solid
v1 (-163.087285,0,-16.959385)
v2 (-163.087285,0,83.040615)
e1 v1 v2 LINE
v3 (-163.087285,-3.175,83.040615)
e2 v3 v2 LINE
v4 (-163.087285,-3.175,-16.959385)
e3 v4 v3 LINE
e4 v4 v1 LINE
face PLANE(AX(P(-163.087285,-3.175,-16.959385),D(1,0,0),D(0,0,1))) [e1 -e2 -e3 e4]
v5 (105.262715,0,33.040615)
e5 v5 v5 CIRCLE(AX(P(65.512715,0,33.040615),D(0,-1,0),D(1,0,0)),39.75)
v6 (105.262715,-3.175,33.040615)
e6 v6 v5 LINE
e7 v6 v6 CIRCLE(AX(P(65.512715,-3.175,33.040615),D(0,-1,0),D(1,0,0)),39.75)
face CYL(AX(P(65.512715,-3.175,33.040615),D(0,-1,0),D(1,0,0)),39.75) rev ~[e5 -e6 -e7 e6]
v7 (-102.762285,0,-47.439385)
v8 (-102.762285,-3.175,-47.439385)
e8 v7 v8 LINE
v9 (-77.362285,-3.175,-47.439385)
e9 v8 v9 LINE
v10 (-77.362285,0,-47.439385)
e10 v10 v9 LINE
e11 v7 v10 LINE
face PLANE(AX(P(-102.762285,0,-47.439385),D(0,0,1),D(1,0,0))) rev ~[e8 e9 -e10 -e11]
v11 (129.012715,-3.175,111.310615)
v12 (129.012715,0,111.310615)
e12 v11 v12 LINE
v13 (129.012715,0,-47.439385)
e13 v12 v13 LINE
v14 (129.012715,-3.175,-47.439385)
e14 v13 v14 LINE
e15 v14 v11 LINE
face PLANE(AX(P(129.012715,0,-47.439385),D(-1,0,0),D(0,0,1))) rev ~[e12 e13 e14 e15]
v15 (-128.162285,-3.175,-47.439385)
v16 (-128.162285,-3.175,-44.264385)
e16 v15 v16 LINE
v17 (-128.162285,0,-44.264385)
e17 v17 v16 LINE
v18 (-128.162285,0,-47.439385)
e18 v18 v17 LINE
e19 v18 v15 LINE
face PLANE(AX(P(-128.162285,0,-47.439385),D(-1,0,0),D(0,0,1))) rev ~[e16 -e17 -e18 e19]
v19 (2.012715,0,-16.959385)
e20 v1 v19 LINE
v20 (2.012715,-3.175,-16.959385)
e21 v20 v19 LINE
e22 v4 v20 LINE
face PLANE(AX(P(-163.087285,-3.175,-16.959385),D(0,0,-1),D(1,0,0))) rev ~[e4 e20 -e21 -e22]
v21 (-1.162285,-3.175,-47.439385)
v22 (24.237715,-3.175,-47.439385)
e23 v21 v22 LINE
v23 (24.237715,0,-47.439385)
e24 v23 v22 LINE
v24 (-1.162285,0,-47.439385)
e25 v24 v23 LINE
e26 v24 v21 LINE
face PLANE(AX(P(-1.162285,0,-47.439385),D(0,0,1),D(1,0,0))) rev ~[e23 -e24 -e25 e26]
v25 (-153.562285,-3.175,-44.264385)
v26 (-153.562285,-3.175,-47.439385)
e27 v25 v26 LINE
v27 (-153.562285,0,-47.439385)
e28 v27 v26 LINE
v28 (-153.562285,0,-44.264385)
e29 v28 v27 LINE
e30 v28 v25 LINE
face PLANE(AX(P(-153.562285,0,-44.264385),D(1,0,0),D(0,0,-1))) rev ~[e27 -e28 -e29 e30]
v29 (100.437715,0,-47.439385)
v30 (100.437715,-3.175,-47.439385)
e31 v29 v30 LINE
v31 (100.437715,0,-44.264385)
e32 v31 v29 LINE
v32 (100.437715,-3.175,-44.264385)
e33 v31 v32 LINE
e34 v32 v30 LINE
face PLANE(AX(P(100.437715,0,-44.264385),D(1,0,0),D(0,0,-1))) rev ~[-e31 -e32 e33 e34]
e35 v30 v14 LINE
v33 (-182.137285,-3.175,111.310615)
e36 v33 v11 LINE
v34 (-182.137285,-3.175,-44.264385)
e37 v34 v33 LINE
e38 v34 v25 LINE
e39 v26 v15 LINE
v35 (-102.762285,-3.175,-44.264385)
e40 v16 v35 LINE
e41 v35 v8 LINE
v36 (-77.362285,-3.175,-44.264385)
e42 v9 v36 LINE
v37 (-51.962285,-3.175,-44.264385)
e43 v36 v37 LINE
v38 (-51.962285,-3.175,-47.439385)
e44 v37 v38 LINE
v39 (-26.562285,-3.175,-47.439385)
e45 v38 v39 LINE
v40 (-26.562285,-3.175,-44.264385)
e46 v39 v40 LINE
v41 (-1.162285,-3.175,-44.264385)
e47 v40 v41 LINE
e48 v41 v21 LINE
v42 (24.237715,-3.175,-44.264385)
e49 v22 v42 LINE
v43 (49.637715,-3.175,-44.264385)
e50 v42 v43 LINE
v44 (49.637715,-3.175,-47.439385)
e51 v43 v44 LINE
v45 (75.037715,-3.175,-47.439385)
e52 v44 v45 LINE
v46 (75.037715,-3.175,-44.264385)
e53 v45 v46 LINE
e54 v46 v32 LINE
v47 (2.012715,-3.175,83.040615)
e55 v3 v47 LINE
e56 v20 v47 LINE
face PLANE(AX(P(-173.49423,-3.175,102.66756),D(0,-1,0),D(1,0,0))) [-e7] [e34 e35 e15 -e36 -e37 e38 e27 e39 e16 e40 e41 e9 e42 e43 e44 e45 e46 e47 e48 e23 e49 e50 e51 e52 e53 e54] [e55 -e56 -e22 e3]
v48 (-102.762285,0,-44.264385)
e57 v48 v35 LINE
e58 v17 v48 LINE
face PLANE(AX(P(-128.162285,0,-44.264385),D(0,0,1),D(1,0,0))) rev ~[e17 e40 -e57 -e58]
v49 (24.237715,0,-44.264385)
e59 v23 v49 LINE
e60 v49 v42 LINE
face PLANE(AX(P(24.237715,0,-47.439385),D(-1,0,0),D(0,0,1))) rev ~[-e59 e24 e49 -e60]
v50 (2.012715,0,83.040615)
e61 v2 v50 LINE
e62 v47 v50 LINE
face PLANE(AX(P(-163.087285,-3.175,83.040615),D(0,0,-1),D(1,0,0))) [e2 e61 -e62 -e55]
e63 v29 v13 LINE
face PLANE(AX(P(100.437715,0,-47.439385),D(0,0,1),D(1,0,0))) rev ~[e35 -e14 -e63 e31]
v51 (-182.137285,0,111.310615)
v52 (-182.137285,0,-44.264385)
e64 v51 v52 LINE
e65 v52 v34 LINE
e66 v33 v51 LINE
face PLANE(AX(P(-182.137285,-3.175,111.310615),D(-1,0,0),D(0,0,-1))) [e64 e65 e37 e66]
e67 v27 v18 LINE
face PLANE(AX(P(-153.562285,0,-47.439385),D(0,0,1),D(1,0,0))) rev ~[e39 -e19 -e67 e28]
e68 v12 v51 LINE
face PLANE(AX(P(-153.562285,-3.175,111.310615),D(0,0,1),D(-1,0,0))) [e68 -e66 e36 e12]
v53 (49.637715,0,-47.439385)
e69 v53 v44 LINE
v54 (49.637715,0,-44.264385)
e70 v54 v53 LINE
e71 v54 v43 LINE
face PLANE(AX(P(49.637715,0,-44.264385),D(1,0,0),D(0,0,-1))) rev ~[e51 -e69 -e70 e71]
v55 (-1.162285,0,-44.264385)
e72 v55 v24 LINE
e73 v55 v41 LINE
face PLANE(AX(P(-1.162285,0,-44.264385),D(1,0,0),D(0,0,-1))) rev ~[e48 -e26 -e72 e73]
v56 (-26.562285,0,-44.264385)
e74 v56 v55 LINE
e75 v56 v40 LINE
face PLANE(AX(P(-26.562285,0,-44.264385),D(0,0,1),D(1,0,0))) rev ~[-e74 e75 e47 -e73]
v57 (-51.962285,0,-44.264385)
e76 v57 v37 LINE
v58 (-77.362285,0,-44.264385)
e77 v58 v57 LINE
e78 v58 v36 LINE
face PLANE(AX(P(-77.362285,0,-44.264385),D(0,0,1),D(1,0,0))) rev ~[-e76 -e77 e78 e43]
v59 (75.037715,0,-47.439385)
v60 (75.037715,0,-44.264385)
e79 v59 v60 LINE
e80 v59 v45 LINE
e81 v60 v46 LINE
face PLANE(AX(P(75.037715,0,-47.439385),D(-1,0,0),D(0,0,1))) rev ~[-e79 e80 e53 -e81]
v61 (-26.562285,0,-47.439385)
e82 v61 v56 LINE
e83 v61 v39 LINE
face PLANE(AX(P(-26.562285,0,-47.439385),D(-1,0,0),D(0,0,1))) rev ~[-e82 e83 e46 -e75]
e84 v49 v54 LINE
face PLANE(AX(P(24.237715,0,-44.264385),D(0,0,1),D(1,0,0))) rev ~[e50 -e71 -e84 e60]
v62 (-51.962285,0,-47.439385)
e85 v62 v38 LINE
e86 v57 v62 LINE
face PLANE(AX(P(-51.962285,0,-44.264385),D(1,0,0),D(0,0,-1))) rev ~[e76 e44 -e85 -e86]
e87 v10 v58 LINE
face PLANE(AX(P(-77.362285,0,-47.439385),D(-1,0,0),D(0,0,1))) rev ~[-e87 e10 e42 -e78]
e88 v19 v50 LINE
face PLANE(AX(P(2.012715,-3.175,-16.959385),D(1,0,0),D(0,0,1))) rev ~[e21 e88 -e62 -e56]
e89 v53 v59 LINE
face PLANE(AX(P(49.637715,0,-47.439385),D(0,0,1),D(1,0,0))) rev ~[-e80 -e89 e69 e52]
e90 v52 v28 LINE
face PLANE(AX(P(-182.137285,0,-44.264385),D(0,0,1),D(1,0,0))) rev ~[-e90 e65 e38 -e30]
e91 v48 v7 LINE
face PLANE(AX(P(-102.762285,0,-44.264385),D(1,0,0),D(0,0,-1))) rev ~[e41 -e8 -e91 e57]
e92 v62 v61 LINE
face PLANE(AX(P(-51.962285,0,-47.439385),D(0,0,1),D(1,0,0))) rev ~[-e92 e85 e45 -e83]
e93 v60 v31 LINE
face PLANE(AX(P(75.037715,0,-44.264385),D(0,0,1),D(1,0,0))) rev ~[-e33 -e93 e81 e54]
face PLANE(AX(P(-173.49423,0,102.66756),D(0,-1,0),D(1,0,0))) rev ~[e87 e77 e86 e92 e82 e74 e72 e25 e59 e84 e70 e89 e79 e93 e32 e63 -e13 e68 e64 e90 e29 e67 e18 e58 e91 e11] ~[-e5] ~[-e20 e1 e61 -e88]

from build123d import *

# Parameters (mm, degrees)
F1_DEPTH = 3.175
F2_W     = 165.1
F2_H     = 100
F2_R     = 39.75
F3_DEPTH = 25.4
F4_W     = 3.175
F4_H     = 25.4
F4_H_2   = 28.575
F4_W_2   = 25.4
F4_H_3   = 3.175
F5_DEPTH = 3.175


# Not quite as in the source:
# - a length typed as a fraction of an inch, garbled in the dataset ("3 / 203.2 mm" for 3/8 in), is restored


with BuildPart() as f1:
    # F0 (on Front) → F1 (new body)
    with BuildSketch(Plane.XZ):
        Polygon((-178.9622853069, -44.2643848114), (-153.5622853069, -44.2643848114), (-153.5622853069, -47.4393848114), (-128.1622853069, -47.4393848114), (-128.1622853069, -44.2643848114), (-102.7622853069, -44.2643848114), (-102.7622853069, -47.4393848114), (-77.3622853069, -47.4393848114), (-77.3622853069, -44.2643848114), (-51.9622853069, -44.2643848114), (-51.9622853069, -47.4393848114), (-26.5622853069, -47.4393848114), (-26.5622853069, -44.2643848114), (-1.1622853069, -44.2643848114), (-1.1622853069, -47.4393848114), (24.2377146931, -47.4393848114), (24.2377146931, -44.2643848114), (49.6377146931, -44.2643848114), (49.6377146931, -47.4393848114), (75.0377146931, -47.4393848114), (75.0377146931, -44.2643848114), (100.4377146931, -44.2643848114), (100.4377146931, -47.4393848114), (125.8377146931, -47.4393848114), (129.0127146931, -47.4393848114), (129.0127146931, -44.2643848114), (129.0127146931, -18.8643848114), (125.8377146931, -18.8643848114), (125.8377146931, 6.5356151886), (129.0127146931, 6.5356151886), (129.0127146931, 31.9356151886), (125.8377146931, 31.9356151886), (125.8377146931, 57.3356151886), (129.0127146931, 57.3356151886), (129.0127146931, 82.7356151886), (125.8377146931, 82.7356151886), (125.8377146931, 108.1356151886), (125.8377146931, 111.3106151886), (100.4377146931, 111.3106151886), (100.4377146931, 108.1356151886), (75.0377146931, 108.1356151886), (75.0377146931, 111.3106151886), (49.6377146931, 111.3106151886), (49.6377146931, 108.1356151886), (24.2377146931, 108.1356151886), (24.2377146931, 111.3106151886), (-1.1622853069, 111.3106151886), (-1.1622853069, 108.1356151886), (-26.5622853069, 108.1356151886), (-26.5622853069, 111.3106151886), (-51.9622853069, 111.3106151886), (-51.9622853069, 108.1356151886), (-77.3622853069, 108.1356151886), (-77.3622853069, 111.3106151886), (-102.7622853069, 111.3106151886), (-102.7622853069, 108.1356151886), (-128.1622853069, 108.1356151886), (-128.1622853069, 111.3106151886), (-153.5622853069, 111.3106151886), (-153.5622853069, 108.1356151886), (-178.9622853069, 108.1356151886), (-178.9622853069, 82.7356151886), (-182.1372853069, 82.7356151886), (-182.1372853069, 57.3356151886), (-178.9622853069, 57.3356151886), (-178.9622853069, 31.9356151886), (-182.1372853069, 31.9356151886), (-182.1372853069, 6.5356151886), (-178.9622853069, 6.5356151886), (-178.9622853069, -18.8643848114), (-182.1372853069, -18.8643848114), (-182.1372853069, -44.2643848114), align=None)
    extrude(amount=F1_DEPTH)

    # F2 (on face) → F3 (cut)
    with BuildSketch(Plane.XZ.offset(3.175)):
        with Locations((-80.5372853069, 33.0406151886)):
            Rectangle(F2_W, F2_H)
        with Locations((65.5127146931, 33.0406151886)):
            Circle(F2_R)
    extrude(amount=-F3_DEPTH, mode=Mode.SUBTRACT)

    # F4 (on face) → F5 (join)
    with BuildSketch(Plane.XZ.offset(3.175)):
        Polygon((-182.1372853069, 111.3106151886), (-182.1372853069, 82.7356151886), (-178.9622853069, 82.7356151886), (-178.9622853069, 108.1356151886), (-153.5622853069, 108.1356151886), (-153.5622853069, 111.3106151886), align=None)
        with Locations((-180.5497853069, 44.6356151886)):
            Rectangle(F4_W, F4_H)
        with Locations((-180.5497853069, -6.1643848114)):
            Rectangle(F4_W, F4_H)
        with Locations((127.4252146931, -6.1643848114)):
            Rectangle(F4_W, F4_H)
        with Locations((127.4252146931, 44.6356151886)):
            Rectangle(F4_W, F4_H)
        with Locations((127.4252146931, 97.0231151886)):
            Rectangle(F4_W, F4_H_2)
        with Locations((87.7377146931, 109.7231151886)):
            Rectangle(F4_W_2, F4_H_3)
        with Locations((36.9377146931, 109.7231151886)):
            Rectangle(F4_W_2, F4_H_3)
        with Locations((-13.8622853069, 109.7231151886)):
            Rectangle(F4_W_2, F4_H_3)
        with Locations((-64.6622853069, 109.7231151886)):
            Rectangle(F4_W_2, F4_H_3)
        with Locations((-115.4622853069, 109.7231151886)):
            Rectangle(F4_W_2, F4_H_3)
    extrude(amount=-F5_DEPTH)


solid = f1.part
